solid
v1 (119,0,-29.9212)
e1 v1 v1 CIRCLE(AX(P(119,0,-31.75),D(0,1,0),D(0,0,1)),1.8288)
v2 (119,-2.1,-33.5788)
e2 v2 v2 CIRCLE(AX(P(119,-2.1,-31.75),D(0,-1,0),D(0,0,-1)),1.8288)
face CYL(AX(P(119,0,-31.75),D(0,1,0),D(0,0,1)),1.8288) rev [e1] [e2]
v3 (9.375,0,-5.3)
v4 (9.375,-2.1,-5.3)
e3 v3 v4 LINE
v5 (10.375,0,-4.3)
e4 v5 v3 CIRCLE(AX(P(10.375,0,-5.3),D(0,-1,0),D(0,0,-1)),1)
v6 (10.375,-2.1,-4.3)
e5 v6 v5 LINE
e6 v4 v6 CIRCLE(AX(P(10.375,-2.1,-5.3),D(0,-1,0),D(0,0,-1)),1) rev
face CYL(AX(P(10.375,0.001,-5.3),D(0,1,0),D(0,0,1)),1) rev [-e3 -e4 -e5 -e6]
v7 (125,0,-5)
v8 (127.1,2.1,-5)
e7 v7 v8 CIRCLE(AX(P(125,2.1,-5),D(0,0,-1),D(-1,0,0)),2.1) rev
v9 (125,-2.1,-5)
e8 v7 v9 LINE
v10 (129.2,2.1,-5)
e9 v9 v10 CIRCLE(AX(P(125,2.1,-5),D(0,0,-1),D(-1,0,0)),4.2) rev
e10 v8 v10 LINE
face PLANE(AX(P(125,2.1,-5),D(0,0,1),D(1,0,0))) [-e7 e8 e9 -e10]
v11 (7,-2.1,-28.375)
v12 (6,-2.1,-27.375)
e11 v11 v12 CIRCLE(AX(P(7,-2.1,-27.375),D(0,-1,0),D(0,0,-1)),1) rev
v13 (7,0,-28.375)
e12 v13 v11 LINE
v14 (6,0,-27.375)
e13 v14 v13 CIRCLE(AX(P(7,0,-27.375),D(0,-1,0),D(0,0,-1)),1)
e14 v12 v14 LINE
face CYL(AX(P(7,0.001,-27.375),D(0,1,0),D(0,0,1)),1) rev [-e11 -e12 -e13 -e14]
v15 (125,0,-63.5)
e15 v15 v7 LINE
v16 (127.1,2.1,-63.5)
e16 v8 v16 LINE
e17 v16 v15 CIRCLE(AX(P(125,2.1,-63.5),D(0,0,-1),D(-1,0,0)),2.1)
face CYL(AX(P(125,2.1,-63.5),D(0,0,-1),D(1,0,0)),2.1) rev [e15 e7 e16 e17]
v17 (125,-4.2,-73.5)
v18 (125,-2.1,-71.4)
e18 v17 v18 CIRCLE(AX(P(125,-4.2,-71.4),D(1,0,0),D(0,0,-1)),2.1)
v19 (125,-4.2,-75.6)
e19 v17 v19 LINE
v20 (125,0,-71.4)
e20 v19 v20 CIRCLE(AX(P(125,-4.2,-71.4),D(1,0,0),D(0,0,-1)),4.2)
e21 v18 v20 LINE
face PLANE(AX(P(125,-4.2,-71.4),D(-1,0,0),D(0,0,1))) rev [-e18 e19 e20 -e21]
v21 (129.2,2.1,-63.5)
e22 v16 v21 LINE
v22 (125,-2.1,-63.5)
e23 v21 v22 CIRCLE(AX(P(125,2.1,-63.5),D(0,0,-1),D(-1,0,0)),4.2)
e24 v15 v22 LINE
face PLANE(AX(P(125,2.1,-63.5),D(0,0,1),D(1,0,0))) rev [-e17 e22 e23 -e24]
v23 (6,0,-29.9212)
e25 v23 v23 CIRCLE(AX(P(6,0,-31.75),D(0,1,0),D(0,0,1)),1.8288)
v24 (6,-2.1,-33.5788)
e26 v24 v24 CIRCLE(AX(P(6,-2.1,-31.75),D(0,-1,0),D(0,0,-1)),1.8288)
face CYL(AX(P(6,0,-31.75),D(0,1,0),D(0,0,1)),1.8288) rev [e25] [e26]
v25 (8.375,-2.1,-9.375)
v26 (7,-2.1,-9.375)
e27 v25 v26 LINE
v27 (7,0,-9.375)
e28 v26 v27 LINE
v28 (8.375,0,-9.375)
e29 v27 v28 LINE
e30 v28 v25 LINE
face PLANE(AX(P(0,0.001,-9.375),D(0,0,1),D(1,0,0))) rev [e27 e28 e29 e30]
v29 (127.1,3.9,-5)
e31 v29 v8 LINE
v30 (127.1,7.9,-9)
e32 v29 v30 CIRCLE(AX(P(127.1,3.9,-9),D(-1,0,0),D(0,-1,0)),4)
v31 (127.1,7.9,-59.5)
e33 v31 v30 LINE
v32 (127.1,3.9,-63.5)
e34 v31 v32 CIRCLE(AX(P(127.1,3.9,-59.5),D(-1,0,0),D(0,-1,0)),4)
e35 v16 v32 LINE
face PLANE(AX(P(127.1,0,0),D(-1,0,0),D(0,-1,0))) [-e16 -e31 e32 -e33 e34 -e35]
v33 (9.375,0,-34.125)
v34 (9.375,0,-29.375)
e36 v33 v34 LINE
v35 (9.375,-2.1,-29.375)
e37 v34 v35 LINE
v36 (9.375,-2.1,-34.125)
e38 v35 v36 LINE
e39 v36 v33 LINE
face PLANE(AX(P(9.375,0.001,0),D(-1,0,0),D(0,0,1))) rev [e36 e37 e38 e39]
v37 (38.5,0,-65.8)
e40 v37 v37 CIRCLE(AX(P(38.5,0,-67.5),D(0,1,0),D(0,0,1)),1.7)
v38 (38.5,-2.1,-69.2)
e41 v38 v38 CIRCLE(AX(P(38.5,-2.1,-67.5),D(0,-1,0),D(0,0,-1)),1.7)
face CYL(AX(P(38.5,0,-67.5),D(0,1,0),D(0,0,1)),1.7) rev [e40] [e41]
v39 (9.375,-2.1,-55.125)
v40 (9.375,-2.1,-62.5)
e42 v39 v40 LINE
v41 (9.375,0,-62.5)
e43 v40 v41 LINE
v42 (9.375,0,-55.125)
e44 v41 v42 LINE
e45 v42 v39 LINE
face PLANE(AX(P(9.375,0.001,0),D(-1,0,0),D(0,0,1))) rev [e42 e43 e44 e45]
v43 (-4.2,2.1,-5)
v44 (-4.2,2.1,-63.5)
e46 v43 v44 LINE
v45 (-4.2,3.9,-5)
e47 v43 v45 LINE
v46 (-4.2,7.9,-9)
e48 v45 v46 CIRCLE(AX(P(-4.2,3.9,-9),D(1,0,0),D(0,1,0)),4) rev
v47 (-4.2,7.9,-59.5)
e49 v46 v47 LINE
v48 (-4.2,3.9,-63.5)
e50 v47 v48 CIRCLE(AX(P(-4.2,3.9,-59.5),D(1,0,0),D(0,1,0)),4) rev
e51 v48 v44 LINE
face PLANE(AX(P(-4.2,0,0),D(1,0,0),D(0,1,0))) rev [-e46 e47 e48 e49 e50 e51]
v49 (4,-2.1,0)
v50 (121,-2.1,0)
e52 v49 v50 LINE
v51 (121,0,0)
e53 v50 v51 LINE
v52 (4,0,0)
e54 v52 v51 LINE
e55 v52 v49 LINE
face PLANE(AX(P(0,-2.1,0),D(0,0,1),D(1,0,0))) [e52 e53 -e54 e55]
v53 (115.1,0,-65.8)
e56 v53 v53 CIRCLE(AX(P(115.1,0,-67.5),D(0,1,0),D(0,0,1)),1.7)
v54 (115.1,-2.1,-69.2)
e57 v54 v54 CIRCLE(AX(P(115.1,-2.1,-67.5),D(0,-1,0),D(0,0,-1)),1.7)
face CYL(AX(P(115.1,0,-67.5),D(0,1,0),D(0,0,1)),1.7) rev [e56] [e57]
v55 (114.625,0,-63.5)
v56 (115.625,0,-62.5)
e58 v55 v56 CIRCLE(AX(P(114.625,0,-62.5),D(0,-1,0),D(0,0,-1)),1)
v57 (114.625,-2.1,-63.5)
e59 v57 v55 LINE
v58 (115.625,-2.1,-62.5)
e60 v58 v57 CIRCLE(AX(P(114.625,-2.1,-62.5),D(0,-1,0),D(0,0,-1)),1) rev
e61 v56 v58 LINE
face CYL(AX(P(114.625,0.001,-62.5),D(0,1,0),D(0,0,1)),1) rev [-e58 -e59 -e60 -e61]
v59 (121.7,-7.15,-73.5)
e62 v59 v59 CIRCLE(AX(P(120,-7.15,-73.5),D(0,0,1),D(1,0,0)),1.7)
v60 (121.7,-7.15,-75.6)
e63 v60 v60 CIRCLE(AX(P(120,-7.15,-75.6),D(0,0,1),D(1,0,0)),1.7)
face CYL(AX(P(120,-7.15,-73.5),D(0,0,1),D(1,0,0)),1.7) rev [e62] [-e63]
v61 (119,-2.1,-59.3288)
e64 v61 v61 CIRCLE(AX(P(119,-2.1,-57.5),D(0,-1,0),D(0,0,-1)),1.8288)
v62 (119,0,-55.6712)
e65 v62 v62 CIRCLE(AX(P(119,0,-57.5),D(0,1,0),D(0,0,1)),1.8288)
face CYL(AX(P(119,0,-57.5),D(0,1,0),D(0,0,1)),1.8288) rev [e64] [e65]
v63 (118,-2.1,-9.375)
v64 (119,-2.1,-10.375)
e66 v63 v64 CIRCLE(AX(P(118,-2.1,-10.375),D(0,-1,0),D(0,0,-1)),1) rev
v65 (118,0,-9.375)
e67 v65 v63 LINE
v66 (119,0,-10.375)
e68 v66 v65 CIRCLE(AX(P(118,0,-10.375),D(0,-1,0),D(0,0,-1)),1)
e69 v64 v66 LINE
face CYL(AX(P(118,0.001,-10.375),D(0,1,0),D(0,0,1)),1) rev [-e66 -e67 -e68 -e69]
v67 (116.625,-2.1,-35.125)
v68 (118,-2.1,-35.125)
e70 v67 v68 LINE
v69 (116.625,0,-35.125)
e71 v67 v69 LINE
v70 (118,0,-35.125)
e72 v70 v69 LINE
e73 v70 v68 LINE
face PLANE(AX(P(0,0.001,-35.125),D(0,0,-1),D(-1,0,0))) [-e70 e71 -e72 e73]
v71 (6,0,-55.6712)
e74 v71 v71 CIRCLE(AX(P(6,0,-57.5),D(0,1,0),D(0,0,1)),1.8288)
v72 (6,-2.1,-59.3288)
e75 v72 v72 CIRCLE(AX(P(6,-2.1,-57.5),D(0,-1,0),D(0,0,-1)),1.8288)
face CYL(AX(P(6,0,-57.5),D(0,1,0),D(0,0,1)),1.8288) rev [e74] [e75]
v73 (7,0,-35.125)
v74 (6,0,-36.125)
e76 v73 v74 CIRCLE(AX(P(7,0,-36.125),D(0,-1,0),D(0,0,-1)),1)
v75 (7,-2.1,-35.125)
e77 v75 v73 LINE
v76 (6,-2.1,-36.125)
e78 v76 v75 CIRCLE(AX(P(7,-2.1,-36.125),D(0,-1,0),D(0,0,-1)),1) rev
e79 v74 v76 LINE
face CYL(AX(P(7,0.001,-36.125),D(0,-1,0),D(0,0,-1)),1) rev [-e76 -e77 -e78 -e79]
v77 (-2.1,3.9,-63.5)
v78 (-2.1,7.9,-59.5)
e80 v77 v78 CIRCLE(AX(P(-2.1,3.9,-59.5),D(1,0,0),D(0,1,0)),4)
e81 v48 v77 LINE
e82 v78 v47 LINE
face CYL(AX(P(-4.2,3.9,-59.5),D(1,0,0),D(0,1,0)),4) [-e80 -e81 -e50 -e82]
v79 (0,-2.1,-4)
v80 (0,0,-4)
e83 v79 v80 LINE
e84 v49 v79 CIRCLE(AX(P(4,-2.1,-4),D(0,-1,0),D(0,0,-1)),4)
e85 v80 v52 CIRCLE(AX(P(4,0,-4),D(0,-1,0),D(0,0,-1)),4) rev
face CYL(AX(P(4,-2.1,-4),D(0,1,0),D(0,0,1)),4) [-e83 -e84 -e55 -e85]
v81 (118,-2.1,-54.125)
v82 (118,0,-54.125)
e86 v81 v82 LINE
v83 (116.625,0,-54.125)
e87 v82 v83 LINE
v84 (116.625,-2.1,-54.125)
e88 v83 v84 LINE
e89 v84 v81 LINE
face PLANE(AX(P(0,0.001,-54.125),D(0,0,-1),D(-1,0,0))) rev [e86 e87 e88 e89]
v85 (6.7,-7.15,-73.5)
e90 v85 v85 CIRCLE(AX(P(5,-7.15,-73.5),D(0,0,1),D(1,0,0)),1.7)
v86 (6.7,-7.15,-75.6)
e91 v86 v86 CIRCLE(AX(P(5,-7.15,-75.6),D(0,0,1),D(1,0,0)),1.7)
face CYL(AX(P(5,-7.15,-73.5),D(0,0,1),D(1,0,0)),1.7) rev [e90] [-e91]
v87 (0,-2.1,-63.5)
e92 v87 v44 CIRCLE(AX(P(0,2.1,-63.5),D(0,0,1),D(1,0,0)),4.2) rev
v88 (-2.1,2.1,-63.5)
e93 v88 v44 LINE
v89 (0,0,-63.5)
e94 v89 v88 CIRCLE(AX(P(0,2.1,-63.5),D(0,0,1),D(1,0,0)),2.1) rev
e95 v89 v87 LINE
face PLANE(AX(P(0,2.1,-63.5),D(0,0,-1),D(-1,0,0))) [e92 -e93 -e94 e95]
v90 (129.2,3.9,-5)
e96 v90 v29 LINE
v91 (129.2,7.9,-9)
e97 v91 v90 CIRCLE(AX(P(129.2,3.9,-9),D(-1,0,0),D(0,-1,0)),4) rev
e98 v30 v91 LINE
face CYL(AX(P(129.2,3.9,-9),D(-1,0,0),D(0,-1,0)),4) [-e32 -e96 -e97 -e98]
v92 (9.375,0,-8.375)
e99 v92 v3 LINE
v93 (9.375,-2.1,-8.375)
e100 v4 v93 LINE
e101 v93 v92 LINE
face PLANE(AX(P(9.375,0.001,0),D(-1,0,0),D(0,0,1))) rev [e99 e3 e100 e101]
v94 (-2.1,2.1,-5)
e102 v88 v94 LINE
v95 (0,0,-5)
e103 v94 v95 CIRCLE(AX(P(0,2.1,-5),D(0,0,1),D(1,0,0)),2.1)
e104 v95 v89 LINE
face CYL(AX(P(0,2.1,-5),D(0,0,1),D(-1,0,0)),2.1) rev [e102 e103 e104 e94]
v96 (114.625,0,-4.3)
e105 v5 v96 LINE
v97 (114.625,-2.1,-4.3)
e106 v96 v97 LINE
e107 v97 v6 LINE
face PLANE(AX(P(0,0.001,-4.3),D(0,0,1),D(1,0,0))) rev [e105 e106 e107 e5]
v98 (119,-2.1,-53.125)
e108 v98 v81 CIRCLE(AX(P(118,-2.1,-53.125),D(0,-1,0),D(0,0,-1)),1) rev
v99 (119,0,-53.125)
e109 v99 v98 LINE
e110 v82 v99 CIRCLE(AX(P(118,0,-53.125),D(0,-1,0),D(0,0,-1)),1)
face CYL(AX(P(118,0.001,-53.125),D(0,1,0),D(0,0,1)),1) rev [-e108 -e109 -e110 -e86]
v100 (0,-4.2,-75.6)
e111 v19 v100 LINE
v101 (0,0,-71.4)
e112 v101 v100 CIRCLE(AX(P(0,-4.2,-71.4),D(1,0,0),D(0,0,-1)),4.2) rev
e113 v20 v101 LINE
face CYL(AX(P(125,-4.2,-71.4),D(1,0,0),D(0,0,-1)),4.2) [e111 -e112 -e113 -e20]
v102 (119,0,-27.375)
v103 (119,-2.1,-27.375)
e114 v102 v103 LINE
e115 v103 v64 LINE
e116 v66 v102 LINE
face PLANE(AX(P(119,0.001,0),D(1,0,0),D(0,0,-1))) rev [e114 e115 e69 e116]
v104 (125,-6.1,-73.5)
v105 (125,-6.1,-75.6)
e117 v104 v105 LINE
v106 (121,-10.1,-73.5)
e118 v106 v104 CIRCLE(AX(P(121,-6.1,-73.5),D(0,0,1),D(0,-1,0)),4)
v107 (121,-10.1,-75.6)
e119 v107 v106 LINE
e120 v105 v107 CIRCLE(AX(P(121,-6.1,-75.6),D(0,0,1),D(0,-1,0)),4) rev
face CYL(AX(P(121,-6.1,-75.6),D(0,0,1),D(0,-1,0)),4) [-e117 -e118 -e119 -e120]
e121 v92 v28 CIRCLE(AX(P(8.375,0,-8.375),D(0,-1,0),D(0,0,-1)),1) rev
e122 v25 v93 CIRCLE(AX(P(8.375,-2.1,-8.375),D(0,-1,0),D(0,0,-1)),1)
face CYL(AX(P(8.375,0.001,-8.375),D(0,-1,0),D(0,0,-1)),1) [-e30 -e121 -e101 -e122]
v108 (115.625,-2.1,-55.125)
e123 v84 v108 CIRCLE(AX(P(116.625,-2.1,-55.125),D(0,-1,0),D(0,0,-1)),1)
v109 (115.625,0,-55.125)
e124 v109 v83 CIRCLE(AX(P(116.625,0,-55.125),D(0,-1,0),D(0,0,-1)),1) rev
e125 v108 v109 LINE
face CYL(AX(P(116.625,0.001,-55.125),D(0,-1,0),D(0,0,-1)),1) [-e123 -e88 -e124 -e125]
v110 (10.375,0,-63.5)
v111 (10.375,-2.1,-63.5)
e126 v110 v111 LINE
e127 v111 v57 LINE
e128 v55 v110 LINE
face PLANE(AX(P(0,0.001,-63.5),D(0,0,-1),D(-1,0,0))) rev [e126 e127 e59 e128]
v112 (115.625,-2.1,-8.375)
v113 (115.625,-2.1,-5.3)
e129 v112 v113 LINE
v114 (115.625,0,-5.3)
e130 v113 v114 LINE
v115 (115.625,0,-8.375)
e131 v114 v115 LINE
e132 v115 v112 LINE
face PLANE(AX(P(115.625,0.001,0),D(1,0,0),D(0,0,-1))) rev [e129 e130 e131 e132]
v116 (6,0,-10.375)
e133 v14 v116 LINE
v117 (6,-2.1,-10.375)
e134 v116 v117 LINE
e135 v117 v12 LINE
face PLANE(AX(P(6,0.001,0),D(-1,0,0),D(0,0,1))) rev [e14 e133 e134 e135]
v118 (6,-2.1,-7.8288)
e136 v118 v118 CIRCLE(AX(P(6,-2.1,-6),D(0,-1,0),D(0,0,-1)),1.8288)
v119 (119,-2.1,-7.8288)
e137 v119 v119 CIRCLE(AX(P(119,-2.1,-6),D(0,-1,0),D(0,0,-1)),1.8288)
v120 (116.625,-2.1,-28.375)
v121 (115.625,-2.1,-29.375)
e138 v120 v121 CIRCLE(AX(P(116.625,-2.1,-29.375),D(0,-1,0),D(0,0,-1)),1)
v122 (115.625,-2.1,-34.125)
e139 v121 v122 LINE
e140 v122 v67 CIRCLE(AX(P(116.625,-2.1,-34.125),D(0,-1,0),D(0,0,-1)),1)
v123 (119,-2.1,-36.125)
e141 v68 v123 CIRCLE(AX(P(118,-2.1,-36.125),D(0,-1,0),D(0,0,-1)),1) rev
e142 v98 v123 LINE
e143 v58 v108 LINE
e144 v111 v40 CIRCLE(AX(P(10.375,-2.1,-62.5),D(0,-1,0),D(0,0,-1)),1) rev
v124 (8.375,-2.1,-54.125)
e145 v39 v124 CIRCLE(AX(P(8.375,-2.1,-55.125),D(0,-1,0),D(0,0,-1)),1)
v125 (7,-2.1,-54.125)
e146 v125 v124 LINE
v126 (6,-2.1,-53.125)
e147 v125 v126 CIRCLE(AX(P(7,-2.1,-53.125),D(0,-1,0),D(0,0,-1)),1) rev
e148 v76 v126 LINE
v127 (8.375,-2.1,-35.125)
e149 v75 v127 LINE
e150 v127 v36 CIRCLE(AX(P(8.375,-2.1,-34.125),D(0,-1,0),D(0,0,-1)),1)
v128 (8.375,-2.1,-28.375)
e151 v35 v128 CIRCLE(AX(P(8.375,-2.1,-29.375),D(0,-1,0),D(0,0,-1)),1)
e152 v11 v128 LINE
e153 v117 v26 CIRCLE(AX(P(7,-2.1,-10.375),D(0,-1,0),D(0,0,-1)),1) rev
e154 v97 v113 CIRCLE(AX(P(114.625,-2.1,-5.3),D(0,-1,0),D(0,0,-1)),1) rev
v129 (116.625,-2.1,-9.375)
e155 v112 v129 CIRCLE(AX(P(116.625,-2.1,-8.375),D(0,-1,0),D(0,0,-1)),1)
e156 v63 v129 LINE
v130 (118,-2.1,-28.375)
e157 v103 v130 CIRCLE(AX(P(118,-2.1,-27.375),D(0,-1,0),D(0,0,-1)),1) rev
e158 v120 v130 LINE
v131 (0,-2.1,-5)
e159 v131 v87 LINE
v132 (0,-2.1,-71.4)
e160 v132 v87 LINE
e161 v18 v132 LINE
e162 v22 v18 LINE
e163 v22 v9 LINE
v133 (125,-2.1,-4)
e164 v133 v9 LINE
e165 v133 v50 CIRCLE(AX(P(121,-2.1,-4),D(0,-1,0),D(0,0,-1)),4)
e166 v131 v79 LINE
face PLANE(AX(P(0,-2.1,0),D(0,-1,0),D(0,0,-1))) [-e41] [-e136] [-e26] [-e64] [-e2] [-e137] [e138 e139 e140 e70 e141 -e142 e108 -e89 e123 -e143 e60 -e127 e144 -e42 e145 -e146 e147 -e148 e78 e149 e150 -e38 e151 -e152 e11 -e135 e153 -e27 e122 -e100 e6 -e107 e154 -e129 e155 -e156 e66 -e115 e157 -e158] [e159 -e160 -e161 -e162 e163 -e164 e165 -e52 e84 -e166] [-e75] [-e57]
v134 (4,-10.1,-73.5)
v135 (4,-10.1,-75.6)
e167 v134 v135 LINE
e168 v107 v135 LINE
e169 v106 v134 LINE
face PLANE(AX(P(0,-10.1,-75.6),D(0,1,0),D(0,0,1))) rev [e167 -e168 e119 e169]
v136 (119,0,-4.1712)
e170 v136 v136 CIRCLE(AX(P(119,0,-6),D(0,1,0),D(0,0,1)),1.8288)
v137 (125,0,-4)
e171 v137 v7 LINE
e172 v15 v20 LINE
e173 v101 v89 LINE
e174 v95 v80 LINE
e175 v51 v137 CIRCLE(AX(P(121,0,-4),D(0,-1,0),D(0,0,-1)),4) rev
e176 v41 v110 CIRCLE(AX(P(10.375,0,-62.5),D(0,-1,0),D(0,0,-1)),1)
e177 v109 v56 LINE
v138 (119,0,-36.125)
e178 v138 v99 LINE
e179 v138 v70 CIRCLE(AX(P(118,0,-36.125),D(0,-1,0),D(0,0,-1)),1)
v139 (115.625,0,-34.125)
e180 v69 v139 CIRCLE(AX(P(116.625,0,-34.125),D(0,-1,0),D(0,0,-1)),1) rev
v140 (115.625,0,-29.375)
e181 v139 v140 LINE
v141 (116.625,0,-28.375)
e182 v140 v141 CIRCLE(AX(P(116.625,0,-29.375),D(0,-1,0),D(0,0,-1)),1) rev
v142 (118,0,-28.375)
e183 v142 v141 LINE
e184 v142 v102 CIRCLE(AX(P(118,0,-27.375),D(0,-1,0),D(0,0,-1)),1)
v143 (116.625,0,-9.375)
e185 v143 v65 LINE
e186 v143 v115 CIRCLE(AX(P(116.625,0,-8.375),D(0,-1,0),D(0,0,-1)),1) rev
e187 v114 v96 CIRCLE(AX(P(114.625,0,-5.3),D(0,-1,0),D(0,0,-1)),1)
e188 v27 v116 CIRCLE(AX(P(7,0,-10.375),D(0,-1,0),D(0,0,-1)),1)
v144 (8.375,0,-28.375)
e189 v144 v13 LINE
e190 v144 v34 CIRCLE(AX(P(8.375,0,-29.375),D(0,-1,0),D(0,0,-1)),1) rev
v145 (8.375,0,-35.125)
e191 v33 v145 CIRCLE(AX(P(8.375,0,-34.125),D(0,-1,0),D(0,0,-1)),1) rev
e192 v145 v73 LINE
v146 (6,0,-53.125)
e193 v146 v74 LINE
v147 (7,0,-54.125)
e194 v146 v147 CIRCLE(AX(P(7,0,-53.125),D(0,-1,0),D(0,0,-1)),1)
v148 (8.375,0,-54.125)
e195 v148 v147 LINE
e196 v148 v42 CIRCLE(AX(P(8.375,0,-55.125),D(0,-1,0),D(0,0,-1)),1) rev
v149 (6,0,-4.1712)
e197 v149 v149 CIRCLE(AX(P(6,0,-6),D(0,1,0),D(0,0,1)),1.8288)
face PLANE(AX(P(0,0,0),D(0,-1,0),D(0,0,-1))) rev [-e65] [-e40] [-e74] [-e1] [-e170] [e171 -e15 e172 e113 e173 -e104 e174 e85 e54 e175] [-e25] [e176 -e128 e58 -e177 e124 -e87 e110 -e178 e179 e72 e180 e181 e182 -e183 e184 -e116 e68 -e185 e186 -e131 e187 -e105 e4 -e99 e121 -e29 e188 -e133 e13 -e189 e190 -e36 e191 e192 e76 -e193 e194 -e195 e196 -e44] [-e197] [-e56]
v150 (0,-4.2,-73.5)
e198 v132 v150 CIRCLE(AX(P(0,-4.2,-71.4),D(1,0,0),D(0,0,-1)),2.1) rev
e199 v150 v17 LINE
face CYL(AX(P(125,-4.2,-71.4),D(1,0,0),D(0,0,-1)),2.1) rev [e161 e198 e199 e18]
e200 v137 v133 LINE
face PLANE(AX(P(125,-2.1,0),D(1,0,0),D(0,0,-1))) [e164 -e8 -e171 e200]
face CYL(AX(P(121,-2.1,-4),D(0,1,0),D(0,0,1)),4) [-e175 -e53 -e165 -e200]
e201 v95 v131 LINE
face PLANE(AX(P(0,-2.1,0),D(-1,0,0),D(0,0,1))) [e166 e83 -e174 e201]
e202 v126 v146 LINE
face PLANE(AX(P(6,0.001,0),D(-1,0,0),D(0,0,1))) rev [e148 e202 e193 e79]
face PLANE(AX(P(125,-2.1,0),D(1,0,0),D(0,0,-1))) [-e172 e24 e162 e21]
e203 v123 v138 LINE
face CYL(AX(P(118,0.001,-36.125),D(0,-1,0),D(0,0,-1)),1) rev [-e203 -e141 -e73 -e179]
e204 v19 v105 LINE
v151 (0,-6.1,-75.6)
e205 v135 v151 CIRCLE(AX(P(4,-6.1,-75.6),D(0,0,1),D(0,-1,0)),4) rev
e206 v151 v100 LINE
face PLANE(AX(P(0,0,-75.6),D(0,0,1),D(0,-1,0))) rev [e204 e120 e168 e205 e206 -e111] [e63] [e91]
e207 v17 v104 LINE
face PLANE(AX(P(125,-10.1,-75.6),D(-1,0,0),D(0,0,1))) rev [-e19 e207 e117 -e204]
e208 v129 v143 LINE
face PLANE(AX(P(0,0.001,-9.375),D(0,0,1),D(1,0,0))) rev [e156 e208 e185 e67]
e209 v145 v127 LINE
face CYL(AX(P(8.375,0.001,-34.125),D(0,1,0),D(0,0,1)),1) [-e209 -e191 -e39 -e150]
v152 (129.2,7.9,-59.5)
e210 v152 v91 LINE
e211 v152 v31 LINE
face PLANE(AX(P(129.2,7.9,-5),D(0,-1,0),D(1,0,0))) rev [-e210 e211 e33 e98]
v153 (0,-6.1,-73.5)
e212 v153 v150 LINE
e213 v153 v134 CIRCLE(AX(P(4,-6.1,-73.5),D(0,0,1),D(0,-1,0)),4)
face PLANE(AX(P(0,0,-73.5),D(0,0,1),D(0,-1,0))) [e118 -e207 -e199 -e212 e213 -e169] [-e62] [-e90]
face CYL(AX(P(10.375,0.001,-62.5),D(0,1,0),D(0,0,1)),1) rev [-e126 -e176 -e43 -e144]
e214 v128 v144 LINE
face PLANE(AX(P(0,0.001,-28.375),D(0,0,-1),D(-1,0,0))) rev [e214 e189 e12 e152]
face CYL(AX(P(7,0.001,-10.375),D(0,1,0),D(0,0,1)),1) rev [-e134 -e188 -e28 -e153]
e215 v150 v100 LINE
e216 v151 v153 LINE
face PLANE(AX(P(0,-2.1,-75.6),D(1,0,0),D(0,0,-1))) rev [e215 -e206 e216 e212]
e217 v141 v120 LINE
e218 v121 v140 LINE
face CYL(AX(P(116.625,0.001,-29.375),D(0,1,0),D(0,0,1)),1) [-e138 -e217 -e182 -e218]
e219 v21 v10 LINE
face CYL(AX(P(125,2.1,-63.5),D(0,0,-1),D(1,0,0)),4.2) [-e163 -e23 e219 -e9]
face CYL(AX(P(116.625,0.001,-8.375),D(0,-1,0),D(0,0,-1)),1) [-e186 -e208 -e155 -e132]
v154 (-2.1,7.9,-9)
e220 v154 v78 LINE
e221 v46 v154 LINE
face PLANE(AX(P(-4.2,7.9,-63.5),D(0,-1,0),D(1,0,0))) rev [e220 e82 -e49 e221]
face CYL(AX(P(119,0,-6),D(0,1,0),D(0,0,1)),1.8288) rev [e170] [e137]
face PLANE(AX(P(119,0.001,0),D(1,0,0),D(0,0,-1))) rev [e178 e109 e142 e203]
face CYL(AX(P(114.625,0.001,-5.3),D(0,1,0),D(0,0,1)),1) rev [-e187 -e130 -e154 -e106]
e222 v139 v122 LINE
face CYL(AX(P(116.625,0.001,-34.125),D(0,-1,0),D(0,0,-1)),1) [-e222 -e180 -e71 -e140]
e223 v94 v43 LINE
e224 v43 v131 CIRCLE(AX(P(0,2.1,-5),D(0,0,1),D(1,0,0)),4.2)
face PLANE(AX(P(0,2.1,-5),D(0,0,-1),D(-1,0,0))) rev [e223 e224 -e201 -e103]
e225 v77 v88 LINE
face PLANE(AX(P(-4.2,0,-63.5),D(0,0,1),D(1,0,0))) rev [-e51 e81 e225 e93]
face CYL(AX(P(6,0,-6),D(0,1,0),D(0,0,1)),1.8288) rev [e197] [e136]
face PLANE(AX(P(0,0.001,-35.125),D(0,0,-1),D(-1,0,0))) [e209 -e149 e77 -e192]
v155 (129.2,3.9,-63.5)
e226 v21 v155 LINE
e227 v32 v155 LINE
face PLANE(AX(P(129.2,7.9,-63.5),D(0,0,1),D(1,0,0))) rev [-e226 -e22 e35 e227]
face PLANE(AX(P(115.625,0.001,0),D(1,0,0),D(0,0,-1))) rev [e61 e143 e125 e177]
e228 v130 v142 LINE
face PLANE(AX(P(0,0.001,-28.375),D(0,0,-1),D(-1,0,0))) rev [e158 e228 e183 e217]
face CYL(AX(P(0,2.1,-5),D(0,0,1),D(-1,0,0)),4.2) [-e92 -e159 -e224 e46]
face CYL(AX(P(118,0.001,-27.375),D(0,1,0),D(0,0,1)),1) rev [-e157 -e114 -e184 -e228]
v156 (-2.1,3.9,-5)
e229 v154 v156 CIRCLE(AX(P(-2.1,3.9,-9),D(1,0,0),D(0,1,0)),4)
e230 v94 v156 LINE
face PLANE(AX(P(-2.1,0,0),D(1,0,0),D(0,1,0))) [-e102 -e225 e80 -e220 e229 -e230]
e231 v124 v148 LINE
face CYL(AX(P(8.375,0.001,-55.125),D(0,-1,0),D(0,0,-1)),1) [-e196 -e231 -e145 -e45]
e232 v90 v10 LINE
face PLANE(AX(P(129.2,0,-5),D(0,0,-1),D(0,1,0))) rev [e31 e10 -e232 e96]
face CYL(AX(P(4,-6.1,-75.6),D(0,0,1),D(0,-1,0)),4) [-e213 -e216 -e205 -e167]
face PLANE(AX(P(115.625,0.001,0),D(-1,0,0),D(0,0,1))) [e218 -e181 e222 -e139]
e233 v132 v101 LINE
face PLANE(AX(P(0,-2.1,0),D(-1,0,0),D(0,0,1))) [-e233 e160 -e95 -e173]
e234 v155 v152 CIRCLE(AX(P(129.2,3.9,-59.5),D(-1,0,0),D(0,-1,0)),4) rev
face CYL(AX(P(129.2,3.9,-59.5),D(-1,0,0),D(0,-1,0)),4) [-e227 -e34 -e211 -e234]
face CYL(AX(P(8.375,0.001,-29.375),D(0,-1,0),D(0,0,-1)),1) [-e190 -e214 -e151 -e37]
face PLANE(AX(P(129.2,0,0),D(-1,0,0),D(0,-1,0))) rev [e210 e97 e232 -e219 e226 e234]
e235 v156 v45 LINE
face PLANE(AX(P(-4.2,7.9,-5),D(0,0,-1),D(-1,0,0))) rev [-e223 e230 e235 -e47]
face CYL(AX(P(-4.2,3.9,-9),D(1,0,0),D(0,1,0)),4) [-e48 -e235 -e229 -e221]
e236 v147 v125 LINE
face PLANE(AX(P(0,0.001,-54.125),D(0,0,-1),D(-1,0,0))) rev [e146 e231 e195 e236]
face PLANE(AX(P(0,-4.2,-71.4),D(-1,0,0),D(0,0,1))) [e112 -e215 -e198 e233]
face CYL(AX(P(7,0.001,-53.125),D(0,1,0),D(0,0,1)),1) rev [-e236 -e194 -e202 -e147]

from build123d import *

# Parameters (mm, degrees)
SKETCH1_W                    = 125
SKETCH1_H                    = 73.5
BASE_FLANGE1_DEPTH           = 2.1
EDGE_FLANGE1_STRIP_W         = 12.6
EDGE_FLANGE1_STRIP_H         = 2.1
EDGE_FLANGE1_STRIP_CUT_DEPTH = 125
EDGE_FLANGE1_DEPTH           = 125
CUT_EXTRUDE1_REACH           = 148.302
PSU_MOUNTING_HOLES_D         = 3.6576
FILLET1_R                    = 1
SSD_MOUNTING_HOLES_D         = 3.4
M3_CLEARANCE_HOLE1_D         = 3.4
EDGE_FLANGE2_DEPTH           = 58.5
EDGE_FLANGE2_BEND_DEPTH      = 58.5
FILLET2_R                    = 4


# Sheet-metal steps are written as plain solids
with BuildPart() as part:
    # Sketch1 → Base-Flange1 (new body)
    with BuildSketch(Plane(origin=(0, 0, 0), x_dir=(1, 0, 0), z_dir=(0, 1, 0))):
        with Locations((62.5, 36.75)):
            Rectangle(SKETCH1_W, SKETCH1_H)
    extrude(amount=-BASE_FLANGE1_DEPTH)

    # Edge-Flange1 strip (across the edge) → Edge-Flange1 strip cut (cut)
    with BuildSketch(Plane(origin=(0, -2.1, -73.5), x_dir=(0, 0, 1), z_dir=(1, 0, 0))):
        with Locations((-4.2, -1.05)):
            Rectangle(EDGE_FLANGE1_STRIP_W, EDGE_FLANGE1_STRIP_H)
    extrude(amount=EDGE_FLANGE1_STRIP_CUT_DEPTH, mode=Mode.SUBTRACT)

    # Edge-Flange1 section (across the edge) → Edge-Flange1 (add)
    with BuildSketch(Plane(origin=(0, -2.1, -73.5), x_dir=(0, 0, 1), z_dir=(1, 0, 0))):
        with BuildLine():
            Line((-2.1, 2.1), (-2.1, 8))
            Line((-2.1, 8), (0, 8))
            Line((0, 8), (0, 2.1))
            ThreePointArc((0, 2.1), (0.61507576, 0.61507576), (2.1, 0))
            Line((2.1, 0), (2.1, -2.1))
            ThreePointArc((2.1, -2.1), (-0.869848481, -0.869848481), (-2.1, 2.1))
        make_face()
    extrude(amount=EDGE_FLANGE1_DEPTH)

    # Sketch7 → Cut-Extrude1 (cut, up to next)
    with BuildSketch(Plane(origin=(0, -2.1, 0), x_dir=(-1, 0, 0), z_dir=(0, -1, 0)), mode=Mode.PRIVATE) as cut_extrude1_sk1:
        Polygon((-115.625, 28.375), (-119, 28.375), (-119, 9.375), (-115.625, 9.375), (-115.625, 4.3), (-9.375, 4.3), (-9.375, 9.375), (-6, 9.375), (-6, 28.375), (-9.375, 28.375), (-9.375, 35.125), (-6, 35.125), (-6, 54.125), (-9.375, 54.125), (-9.375, 63.5), (-115.625, 63.5), (-115.625, 54.125), (-119, 54.125), (-119, 35.125), (-115.625, 35.125), align=None)
    cut_extrude1_tool1 = extrude(cut_extrude1_sk1.sketch, amount=-CUT_EXTRUDE1_REACH, mode=Mode.PRIVATE) & part.part
    add(cut_extrude1_tool1.solids().sort_by_distance((62.5, -2.1, -33.81576))[0], mode=Mode.SUBTRACT)

    # psu-mounting-holes (through all)
    with Locations(Plane(origin=(0, 0, 0), x_dir=(1, 0, 0), z_dir=(0, 1, 0))):
        with Locations((119, 6), (119, 57.5), (6, 6), (6, 57.5), (6, 31.75), (119, 31.75)):
            Hole(PSU_MOUNTING_HOLES_D / 2)

    # Fillet1
    fillet1_edges = [part.edges().sort_by_distance(p)[0] for p in [
        (119, -1.05, -28.375),
        (115.625, -1.05, -28.375),
        (115.625, -1.05, -35.125),
        (119, -1.05, -35.125),
        (119, -1.05, -54.125),
        (115.625, -1.05, -54.125),
        (115.625, -1.05, -63.5),
        (9.375, -1.05, -63.5),
        (9.375, -1.05, -54.125),
        (6, -1.05, -54.125),
        (6, -1.05, -35.125),
        (9.375, -1.05, -35.125),
        (9.375, -1.05, -28.375),
        (6, -1.05, -28.375),
        (6, -1.05, -9.375),
        (9.375, -1.05, -9.375),
        (9.375, -1.05, -4.3),
        (115.625, -1.05, -4.3),
        (115.625, -1.05, -9.375),
        (119, -1.05, -9.375),
    ]]
    fillet(fillet1_edges, radius=FILLET1_R)

    # ssd-mounting-holes (through all)
    with Locations(Plane(origin=(0, 0, 0), x_dir=(1, 0, 0), z_dir=(0, 1, 0))):
        with Locations((115.1, 67.5), (38.5, 67.5)):
            Hole(SSD_MOUNTING_HOLES_D / 2)

    # M3 Clearance Hole1 (through all)
    with Locations(Plane.XY.offset(-73.5)):
        with Locations((120, -7.15), (5, -7.15)):
            Hole(M3_CLEARANCE_HOLE1_D / 2)

    # Edge-Flange2 section (across the edge) → Edge-Flange2 (add)
    with BuildSketch(Plane(origin=(127.1, 0, -5), x_dir=(-1, 0, 0), z_dir=(0, 0, -1))):
        with BuildLine():
            Line((-2.1, 2.1), (-2.1, 7.9))
            Line((-2.1, 7.9), (0, 7.9))
            Line((0, 7.9), (0, 2.1))
            ThreePointArc((0, 2.1), (0.61507576, 0.61507576), (2.1, 0))
            Line((2.1, 0), (2.1, -2.1))
            ThreePointArc((2.1, -2.1), (-0.869848481, -0.869848481), (-2.1, 2.1))
        make_face()
    extrude(amount=EDGE_FLANGE2_DEPTH)

    # Edge-Flange2 section 2 (across the edge) → Edge-Flange2 bend (add)
    with BuildSketch(Plane(origin=(-2.1, 0, -63.5), x_dir=(1, 0, 0), z_dir=(0, 0, 1))):
        with BuildLine():
            Line((-2.1, 2.1), (-2.1, 7.9))
            Line((-2.1, 7.9), (0, 7.9))
            Line((0, 7.9), (0, 2.1))
            ThreePointArc((0, 2.1), (0.61507576, 0.61507576), (2.1, 0))
            Line((2.1, 0), (2.1, -2.1))
            ThreePointArc((2.1, -2.1), (-0.869848481, -0.869848481), (-2.1, 2.1))
        make_face()
    extrude(amount=EDGE_FLANGE2_BEND_DEPTH)

    # Fillet2
    fillet2_edges = [part.edges().sort_by_distance(p)[0] for p in [
        (128.15, 7.9, -5),
        (128.15, 7.9, -63.5),
        (0, -10.1, -74.55),
        (-3.15, 7.9, -63.5),
        (-3.15, 7.9, -5),
        (125, -10.1, -74.55),
        (125, -1.05, 0),
        (0, -1.05, 0),
    ]]
    fillet(fillet2_edges, radius=FILLET2_R)


solid = part.part
